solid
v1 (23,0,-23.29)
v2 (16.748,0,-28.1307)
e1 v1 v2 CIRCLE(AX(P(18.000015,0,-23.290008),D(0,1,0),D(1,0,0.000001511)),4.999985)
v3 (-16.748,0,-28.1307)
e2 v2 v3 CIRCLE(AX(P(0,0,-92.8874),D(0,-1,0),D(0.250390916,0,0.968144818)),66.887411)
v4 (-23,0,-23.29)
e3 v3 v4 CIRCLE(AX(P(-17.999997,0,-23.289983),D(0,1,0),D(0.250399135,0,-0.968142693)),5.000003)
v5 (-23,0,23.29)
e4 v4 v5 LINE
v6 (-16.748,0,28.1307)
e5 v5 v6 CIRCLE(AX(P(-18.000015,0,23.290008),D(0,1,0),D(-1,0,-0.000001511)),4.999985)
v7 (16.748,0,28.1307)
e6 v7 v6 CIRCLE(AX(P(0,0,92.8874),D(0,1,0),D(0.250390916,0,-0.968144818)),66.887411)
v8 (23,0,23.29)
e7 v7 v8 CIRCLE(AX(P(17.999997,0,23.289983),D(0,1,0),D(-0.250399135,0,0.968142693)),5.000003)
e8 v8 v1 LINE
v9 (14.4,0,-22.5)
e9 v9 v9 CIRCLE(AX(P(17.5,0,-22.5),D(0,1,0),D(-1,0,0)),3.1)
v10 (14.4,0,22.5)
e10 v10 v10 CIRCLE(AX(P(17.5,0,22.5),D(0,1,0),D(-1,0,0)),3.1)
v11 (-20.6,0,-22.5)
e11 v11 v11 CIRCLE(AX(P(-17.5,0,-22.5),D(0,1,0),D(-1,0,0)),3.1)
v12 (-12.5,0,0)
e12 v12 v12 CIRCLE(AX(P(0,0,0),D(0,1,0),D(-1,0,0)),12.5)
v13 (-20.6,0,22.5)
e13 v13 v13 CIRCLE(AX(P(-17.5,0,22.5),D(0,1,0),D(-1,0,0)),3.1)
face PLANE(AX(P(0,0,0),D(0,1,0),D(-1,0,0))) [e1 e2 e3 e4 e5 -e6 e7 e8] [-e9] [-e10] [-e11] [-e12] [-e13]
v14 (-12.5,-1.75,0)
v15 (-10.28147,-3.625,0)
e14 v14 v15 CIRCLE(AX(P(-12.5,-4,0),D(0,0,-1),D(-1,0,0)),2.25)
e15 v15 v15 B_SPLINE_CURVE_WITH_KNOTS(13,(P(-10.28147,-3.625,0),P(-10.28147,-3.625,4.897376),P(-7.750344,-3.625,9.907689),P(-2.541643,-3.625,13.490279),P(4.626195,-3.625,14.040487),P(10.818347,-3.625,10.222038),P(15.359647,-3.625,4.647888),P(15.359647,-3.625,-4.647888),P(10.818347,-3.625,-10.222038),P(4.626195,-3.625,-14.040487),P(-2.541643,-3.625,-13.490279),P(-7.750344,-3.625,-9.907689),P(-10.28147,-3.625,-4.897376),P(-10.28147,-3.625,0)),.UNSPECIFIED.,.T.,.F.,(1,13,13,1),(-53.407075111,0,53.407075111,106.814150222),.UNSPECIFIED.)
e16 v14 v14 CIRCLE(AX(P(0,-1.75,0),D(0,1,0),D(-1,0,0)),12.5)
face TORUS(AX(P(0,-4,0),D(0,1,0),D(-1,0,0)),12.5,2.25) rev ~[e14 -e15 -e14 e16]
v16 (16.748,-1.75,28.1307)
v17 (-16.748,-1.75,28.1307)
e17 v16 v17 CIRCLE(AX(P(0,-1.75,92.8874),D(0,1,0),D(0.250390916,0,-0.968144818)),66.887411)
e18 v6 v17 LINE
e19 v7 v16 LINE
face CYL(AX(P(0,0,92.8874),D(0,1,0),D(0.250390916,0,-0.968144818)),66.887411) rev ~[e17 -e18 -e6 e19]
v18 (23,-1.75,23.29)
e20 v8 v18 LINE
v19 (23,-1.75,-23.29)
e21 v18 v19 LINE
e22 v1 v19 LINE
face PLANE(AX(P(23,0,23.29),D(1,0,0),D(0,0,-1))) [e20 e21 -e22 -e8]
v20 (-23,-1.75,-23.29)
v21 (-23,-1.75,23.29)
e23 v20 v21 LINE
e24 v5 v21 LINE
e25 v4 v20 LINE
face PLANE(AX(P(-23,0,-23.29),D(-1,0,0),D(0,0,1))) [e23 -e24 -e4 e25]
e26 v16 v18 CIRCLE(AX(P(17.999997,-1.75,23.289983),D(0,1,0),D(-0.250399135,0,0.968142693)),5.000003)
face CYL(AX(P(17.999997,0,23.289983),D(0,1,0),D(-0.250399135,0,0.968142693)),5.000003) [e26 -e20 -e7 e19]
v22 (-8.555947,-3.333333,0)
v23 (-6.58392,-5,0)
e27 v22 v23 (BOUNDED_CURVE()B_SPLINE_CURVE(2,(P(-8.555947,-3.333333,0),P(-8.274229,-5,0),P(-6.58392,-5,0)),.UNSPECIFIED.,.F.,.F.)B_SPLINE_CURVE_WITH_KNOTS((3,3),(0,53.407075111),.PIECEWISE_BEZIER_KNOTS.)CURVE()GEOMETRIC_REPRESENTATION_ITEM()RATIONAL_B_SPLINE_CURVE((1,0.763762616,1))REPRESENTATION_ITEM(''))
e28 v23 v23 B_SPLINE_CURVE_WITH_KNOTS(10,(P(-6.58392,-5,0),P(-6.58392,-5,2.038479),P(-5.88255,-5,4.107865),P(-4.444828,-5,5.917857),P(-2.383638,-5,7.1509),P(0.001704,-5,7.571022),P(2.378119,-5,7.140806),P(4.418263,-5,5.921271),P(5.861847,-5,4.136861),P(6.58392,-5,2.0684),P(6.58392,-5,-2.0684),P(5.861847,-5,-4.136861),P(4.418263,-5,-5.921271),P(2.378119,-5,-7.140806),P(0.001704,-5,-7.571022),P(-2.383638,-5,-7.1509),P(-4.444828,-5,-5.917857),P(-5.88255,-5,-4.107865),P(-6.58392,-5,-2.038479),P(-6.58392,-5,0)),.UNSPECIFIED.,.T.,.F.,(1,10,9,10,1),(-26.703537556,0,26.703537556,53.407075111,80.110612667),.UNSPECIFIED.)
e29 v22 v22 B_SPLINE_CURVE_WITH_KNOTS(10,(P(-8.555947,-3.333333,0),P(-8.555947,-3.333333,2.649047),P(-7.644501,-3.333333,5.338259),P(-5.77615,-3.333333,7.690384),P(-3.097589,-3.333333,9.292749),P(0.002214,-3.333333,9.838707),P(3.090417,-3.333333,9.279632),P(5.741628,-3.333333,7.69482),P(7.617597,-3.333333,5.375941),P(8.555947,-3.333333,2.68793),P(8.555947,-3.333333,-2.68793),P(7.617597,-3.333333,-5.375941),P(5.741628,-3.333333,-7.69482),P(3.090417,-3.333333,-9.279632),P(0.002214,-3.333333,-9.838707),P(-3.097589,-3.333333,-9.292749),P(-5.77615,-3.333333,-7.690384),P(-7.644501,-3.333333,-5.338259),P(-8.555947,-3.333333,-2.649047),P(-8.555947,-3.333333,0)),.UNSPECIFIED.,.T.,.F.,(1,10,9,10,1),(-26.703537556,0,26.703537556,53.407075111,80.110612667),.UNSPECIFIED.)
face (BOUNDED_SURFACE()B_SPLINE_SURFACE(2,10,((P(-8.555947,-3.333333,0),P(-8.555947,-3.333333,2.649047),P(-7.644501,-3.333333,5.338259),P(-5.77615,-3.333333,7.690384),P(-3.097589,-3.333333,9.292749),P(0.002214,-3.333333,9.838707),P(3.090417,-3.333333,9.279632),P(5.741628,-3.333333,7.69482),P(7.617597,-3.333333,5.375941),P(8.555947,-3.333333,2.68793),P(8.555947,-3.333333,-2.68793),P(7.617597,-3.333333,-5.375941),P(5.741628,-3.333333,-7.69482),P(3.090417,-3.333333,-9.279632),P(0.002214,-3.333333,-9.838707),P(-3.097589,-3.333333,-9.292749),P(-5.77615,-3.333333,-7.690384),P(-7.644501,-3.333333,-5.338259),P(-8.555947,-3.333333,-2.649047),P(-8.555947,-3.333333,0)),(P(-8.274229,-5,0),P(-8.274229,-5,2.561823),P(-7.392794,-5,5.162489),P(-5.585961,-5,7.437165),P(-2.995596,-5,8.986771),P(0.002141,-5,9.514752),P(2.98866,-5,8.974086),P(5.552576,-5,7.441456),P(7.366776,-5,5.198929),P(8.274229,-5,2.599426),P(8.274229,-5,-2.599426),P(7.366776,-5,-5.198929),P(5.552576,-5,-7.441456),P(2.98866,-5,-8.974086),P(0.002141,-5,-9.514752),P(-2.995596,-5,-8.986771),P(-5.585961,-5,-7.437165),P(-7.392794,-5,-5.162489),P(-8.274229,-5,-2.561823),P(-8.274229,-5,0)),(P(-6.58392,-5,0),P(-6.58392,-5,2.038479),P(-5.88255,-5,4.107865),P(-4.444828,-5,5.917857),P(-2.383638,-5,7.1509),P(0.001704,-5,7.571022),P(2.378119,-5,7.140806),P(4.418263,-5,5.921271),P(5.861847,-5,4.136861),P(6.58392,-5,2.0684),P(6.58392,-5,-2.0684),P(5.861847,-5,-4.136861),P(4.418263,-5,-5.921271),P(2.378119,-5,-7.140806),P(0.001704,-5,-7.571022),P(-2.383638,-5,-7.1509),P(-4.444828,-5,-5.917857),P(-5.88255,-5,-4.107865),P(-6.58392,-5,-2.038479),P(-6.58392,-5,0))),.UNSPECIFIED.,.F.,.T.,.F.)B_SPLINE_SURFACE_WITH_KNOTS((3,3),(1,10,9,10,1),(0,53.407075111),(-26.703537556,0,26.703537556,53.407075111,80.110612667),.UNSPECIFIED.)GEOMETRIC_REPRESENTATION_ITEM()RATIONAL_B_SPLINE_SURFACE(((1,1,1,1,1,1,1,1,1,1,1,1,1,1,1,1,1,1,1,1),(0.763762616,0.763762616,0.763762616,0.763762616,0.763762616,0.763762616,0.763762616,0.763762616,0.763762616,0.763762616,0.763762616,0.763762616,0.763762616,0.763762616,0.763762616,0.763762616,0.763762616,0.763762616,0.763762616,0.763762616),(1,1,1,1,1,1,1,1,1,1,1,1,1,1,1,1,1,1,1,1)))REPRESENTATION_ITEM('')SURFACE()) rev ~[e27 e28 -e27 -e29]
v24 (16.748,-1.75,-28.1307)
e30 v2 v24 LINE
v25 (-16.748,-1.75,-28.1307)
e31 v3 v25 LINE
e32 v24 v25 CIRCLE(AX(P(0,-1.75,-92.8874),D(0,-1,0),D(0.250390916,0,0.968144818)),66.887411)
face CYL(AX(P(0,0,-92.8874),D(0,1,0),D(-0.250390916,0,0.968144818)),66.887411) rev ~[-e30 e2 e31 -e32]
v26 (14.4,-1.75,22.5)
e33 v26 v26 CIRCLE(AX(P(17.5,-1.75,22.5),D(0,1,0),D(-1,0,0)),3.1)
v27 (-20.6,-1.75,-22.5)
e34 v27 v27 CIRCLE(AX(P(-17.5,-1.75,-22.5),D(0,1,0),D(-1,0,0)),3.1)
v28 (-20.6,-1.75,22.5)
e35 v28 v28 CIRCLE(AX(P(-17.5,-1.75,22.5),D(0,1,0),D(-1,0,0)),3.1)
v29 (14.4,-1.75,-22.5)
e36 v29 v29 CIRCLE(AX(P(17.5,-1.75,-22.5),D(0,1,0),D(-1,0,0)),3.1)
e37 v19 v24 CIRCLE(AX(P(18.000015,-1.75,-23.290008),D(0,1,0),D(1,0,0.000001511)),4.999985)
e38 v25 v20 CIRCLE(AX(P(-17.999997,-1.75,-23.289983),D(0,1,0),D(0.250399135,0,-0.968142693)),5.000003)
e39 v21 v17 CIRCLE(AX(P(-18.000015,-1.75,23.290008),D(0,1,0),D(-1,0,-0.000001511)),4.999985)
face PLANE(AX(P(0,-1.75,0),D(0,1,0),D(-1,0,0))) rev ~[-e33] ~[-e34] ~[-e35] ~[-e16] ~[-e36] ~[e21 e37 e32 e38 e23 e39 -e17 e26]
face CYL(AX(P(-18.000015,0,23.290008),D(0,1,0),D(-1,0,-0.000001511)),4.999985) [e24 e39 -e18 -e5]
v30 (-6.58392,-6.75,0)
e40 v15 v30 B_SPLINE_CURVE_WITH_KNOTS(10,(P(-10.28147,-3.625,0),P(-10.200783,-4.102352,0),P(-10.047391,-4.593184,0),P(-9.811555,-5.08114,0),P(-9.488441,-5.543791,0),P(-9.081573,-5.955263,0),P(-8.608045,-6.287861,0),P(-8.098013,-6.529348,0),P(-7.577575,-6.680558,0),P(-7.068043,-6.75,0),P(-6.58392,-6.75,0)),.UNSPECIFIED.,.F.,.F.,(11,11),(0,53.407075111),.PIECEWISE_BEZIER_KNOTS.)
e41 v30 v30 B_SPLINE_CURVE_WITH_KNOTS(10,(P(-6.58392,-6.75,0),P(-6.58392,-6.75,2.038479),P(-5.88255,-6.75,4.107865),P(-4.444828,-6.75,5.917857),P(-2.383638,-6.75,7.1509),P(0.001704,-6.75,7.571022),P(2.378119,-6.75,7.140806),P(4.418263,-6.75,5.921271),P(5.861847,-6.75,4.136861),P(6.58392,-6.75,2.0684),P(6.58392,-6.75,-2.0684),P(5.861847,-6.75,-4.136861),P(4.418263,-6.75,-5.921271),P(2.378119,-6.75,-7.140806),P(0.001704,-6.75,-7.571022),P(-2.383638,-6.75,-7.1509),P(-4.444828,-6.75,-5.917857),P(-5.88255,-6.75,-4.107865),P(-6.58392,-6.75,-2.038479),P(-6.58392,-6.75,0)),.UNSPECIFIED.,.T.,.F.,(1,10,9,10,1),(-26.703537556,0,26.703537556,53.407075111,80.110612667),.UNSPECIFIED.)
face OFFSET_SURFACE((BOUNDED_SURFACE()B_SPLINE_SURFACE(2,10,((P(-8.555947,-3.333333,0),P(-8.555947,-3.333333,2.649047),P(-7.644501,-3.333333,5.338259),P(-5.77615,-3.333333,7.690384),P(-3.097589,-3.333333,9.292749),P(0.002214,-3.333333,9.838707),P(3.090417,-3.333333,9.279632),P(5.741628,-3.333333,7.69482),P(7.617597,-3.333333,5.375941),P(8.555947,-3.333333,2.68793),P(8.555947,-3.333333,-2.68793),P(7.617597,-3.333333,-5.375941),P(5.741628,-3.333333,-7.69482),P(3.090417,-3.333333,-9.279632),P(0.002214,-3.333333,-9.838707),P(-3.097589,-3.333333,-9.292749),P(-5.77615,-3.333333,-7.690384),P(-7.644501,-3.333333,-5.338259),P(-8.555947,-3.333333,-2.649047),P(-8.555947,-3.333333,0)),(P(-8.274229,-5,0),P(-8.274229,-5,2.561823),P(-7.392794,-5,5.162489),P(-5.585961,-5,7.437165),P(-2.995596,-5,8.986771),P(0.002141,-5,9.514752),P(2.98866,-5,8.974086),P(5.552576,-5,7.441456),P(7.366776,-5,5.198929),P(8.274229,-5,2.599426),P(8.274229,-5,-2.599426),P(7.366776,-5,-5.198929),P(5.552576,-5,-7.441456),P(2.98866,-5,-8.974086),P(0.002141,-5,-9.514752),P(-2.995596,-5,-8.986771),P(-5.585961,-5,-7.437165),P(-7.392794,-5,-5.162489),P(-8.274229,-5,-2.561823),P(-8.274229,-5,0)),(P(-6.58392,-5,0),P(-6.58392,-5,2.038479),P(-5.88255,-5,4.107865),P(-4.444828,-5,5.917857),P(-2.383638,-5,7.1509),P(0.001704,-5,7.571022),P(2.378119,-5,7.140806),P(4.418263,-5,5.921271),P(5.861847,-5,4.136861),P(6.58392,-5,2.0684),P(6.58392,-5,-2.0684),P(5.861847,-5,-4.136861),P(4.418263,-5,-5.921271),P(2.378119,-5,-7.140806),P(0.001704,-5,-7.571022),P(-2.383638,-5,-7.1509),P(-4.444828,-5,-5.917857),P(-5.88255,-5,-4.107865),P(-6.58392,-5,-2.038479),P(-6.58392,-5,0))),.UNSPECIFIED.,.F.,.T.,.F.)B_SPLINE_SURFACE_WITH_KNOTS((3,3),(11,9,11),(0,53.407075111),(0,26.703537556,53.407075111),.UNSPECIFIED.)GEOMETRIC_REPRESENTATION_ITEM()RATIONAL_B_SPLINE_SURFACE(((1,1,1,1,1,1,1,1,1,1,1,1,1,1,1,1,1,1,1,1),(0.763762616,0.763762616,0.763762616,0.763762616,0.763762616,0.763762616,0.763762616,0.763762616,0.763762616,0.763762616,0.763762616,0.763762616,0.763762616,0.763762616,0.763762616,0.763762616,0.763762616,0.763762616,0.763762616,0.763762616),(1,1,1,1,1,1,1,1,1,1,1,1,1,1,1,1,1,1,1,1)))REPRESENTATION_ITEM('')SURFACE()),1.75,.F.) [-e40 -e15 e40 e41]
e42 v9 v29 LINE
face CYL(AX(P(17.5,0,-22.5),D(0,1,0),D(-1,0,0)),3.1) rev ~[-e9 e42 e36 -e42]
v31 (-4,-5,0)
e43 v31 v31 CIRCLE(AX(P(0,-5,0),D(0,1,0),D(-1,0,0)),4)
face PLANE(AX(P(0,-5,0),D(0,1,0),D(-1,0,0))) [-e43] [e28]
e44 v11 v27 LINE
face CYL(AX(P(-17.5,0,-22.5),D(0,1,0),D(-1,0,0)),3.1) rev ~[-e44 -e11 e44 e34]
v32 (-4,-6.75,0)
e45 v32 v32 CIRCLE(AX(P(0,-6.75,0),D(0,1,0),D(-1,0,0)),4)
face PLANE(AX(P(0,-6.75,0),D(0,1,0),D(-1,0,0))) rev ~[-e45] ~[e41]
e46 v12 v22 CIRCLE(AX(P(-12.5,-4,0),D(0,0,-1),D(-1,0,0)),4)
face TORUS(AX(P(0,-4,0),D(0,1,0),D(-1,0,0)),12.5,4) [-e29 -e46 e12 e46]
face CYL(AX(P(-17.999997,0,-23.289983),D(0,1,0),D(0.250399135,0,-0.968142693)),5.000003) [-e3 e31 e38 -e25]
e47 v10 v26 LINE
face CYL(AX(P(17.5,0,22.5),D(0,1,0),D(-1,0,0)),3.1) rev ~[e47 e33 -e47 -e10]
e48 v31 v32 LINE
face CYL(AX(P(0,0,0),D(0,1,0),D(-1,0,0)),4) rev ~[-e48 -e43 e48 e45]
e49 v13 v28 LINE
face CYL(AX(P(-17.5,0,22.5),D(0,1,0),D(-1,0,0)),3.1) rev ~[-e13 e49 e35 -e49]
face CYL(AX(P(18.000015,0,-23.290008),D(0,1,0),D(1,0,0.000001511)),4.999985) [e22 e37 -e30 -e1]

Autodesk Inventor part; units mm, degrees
ref_plane "YZ Plane" through (0, 0, 0) normal (1, 0, 0) x (0, 1, 0)
ref_plane "XZ Plane" through (0, 0, 0) normal (0, 1, 0) x (-1, 0, 0)
ref_plane "XY Plane" through (0, 0, 0) normal (0, 0, 1) x (1, 0, 0)
sketch "Sketch1" plane through (0, 0, 0) normal (0, 1, 0) x (-1, 0, 0)
  line L0 (-23, 23.29) -> (-23, -23.29)
  line L1 (23, -23.29) -> (23, 23.29)
  line L2 (0, 0) -> (0, -50.5577)
  line L3 (0, 0) -> (-7.5284, 0)
  arc A0 (16.748, -28.1307) -> (-16.748, -28.1307) centre (0, -92.8874) ccw
  arc A1 (-16.748, 28.1307) -> (16.748, 28.1307) centre (0, 92.8874) ccw
  arc A2 (-16.748, 28.1307) -> (-23, 23.29) centre (-18, 23.29) ccw
  arc A3 (-23, -23.29) -> (-16.748, -28.1307) centre (-18, -23.29) ccw
  arc A4 (16.748, -28.1307) -> (23, -23.29) centre (18, -23.29) ccw
  arc A5 (23, 23.29) -> (16.748, 28.1307) centre (18, 23.29) ccw
  line L4 (61.758, -28.29) -> (80.0321, -28.29)
  line L5 (64.4221, 28.29) -> (84.7267, 28.29)
  circle A6 centre (-17.5, -22.5) radius 3.1
  circle A7 centre (17.5, 22.5) radius 3.1
  circle A8 centre (17.5, -22.5) radius 3.1
  circle A9 centre (-17.5, 22.5) radius 3.1
  circle A10 centre (0, 0) radius 8.5
  circle A11 centre (0, 0) radius 4
  dimension "d0" = 52
  dimension "d1" = 46
  dimension "d2" = 5
  dimension "d3" = 56.58
  dimension "d4" = 45
  dimension "d5" = 35
  dimension "d6" = 6.2
  dimension "d9" = 17
  dimension "d15" = 8
extrude "Extrusion1" add sketch "Sketch1" against normal blind 10 contours A2 A1 A5 L1 A4 A0 A3 L0 | L3 A11 L2 | L2 A11 L3 | A6 | A7 | A8 | A9 | A10
extrude "Extrusion2" cut sketch "Sketch1" against normal blind 5 contours L3 A11 L2 | L2 A11 L3 | A10
fillet "Fillet1" radius 4 1 edges at (8.5, 0, 0)
fillet "Fillet2" radius 2 1 edges at (8.5, -5, 0)
shell "Shell1" thickness 1.75 removed faces 9 at (11.424, -10, -7.7633) at (22.3091, -6.6667, 25.8261) at (17.1192, -6.6667, -28.2118) at (-13.0815, -3.3333, 27.2917) at (-13.0815, -6.6667, -27.2917) at (-22.1041, -6.6667, 26.146) at (-22.3091, -6.6667, -25.8261) at (-23, -3.3333, -7.7633) at (23, -3.3333, 7.7633)
extrude "Extrusion3" cut sketch "Sketch1" against normal through all contours L3 A11 L2 | L2 A11 L3 | A6 | A7 | A8 | A9
equation "\"d15\" = 2 * d25"
equation "\"d25\" = 4"
properties part number "Wheel 75 mm - Part 6"
